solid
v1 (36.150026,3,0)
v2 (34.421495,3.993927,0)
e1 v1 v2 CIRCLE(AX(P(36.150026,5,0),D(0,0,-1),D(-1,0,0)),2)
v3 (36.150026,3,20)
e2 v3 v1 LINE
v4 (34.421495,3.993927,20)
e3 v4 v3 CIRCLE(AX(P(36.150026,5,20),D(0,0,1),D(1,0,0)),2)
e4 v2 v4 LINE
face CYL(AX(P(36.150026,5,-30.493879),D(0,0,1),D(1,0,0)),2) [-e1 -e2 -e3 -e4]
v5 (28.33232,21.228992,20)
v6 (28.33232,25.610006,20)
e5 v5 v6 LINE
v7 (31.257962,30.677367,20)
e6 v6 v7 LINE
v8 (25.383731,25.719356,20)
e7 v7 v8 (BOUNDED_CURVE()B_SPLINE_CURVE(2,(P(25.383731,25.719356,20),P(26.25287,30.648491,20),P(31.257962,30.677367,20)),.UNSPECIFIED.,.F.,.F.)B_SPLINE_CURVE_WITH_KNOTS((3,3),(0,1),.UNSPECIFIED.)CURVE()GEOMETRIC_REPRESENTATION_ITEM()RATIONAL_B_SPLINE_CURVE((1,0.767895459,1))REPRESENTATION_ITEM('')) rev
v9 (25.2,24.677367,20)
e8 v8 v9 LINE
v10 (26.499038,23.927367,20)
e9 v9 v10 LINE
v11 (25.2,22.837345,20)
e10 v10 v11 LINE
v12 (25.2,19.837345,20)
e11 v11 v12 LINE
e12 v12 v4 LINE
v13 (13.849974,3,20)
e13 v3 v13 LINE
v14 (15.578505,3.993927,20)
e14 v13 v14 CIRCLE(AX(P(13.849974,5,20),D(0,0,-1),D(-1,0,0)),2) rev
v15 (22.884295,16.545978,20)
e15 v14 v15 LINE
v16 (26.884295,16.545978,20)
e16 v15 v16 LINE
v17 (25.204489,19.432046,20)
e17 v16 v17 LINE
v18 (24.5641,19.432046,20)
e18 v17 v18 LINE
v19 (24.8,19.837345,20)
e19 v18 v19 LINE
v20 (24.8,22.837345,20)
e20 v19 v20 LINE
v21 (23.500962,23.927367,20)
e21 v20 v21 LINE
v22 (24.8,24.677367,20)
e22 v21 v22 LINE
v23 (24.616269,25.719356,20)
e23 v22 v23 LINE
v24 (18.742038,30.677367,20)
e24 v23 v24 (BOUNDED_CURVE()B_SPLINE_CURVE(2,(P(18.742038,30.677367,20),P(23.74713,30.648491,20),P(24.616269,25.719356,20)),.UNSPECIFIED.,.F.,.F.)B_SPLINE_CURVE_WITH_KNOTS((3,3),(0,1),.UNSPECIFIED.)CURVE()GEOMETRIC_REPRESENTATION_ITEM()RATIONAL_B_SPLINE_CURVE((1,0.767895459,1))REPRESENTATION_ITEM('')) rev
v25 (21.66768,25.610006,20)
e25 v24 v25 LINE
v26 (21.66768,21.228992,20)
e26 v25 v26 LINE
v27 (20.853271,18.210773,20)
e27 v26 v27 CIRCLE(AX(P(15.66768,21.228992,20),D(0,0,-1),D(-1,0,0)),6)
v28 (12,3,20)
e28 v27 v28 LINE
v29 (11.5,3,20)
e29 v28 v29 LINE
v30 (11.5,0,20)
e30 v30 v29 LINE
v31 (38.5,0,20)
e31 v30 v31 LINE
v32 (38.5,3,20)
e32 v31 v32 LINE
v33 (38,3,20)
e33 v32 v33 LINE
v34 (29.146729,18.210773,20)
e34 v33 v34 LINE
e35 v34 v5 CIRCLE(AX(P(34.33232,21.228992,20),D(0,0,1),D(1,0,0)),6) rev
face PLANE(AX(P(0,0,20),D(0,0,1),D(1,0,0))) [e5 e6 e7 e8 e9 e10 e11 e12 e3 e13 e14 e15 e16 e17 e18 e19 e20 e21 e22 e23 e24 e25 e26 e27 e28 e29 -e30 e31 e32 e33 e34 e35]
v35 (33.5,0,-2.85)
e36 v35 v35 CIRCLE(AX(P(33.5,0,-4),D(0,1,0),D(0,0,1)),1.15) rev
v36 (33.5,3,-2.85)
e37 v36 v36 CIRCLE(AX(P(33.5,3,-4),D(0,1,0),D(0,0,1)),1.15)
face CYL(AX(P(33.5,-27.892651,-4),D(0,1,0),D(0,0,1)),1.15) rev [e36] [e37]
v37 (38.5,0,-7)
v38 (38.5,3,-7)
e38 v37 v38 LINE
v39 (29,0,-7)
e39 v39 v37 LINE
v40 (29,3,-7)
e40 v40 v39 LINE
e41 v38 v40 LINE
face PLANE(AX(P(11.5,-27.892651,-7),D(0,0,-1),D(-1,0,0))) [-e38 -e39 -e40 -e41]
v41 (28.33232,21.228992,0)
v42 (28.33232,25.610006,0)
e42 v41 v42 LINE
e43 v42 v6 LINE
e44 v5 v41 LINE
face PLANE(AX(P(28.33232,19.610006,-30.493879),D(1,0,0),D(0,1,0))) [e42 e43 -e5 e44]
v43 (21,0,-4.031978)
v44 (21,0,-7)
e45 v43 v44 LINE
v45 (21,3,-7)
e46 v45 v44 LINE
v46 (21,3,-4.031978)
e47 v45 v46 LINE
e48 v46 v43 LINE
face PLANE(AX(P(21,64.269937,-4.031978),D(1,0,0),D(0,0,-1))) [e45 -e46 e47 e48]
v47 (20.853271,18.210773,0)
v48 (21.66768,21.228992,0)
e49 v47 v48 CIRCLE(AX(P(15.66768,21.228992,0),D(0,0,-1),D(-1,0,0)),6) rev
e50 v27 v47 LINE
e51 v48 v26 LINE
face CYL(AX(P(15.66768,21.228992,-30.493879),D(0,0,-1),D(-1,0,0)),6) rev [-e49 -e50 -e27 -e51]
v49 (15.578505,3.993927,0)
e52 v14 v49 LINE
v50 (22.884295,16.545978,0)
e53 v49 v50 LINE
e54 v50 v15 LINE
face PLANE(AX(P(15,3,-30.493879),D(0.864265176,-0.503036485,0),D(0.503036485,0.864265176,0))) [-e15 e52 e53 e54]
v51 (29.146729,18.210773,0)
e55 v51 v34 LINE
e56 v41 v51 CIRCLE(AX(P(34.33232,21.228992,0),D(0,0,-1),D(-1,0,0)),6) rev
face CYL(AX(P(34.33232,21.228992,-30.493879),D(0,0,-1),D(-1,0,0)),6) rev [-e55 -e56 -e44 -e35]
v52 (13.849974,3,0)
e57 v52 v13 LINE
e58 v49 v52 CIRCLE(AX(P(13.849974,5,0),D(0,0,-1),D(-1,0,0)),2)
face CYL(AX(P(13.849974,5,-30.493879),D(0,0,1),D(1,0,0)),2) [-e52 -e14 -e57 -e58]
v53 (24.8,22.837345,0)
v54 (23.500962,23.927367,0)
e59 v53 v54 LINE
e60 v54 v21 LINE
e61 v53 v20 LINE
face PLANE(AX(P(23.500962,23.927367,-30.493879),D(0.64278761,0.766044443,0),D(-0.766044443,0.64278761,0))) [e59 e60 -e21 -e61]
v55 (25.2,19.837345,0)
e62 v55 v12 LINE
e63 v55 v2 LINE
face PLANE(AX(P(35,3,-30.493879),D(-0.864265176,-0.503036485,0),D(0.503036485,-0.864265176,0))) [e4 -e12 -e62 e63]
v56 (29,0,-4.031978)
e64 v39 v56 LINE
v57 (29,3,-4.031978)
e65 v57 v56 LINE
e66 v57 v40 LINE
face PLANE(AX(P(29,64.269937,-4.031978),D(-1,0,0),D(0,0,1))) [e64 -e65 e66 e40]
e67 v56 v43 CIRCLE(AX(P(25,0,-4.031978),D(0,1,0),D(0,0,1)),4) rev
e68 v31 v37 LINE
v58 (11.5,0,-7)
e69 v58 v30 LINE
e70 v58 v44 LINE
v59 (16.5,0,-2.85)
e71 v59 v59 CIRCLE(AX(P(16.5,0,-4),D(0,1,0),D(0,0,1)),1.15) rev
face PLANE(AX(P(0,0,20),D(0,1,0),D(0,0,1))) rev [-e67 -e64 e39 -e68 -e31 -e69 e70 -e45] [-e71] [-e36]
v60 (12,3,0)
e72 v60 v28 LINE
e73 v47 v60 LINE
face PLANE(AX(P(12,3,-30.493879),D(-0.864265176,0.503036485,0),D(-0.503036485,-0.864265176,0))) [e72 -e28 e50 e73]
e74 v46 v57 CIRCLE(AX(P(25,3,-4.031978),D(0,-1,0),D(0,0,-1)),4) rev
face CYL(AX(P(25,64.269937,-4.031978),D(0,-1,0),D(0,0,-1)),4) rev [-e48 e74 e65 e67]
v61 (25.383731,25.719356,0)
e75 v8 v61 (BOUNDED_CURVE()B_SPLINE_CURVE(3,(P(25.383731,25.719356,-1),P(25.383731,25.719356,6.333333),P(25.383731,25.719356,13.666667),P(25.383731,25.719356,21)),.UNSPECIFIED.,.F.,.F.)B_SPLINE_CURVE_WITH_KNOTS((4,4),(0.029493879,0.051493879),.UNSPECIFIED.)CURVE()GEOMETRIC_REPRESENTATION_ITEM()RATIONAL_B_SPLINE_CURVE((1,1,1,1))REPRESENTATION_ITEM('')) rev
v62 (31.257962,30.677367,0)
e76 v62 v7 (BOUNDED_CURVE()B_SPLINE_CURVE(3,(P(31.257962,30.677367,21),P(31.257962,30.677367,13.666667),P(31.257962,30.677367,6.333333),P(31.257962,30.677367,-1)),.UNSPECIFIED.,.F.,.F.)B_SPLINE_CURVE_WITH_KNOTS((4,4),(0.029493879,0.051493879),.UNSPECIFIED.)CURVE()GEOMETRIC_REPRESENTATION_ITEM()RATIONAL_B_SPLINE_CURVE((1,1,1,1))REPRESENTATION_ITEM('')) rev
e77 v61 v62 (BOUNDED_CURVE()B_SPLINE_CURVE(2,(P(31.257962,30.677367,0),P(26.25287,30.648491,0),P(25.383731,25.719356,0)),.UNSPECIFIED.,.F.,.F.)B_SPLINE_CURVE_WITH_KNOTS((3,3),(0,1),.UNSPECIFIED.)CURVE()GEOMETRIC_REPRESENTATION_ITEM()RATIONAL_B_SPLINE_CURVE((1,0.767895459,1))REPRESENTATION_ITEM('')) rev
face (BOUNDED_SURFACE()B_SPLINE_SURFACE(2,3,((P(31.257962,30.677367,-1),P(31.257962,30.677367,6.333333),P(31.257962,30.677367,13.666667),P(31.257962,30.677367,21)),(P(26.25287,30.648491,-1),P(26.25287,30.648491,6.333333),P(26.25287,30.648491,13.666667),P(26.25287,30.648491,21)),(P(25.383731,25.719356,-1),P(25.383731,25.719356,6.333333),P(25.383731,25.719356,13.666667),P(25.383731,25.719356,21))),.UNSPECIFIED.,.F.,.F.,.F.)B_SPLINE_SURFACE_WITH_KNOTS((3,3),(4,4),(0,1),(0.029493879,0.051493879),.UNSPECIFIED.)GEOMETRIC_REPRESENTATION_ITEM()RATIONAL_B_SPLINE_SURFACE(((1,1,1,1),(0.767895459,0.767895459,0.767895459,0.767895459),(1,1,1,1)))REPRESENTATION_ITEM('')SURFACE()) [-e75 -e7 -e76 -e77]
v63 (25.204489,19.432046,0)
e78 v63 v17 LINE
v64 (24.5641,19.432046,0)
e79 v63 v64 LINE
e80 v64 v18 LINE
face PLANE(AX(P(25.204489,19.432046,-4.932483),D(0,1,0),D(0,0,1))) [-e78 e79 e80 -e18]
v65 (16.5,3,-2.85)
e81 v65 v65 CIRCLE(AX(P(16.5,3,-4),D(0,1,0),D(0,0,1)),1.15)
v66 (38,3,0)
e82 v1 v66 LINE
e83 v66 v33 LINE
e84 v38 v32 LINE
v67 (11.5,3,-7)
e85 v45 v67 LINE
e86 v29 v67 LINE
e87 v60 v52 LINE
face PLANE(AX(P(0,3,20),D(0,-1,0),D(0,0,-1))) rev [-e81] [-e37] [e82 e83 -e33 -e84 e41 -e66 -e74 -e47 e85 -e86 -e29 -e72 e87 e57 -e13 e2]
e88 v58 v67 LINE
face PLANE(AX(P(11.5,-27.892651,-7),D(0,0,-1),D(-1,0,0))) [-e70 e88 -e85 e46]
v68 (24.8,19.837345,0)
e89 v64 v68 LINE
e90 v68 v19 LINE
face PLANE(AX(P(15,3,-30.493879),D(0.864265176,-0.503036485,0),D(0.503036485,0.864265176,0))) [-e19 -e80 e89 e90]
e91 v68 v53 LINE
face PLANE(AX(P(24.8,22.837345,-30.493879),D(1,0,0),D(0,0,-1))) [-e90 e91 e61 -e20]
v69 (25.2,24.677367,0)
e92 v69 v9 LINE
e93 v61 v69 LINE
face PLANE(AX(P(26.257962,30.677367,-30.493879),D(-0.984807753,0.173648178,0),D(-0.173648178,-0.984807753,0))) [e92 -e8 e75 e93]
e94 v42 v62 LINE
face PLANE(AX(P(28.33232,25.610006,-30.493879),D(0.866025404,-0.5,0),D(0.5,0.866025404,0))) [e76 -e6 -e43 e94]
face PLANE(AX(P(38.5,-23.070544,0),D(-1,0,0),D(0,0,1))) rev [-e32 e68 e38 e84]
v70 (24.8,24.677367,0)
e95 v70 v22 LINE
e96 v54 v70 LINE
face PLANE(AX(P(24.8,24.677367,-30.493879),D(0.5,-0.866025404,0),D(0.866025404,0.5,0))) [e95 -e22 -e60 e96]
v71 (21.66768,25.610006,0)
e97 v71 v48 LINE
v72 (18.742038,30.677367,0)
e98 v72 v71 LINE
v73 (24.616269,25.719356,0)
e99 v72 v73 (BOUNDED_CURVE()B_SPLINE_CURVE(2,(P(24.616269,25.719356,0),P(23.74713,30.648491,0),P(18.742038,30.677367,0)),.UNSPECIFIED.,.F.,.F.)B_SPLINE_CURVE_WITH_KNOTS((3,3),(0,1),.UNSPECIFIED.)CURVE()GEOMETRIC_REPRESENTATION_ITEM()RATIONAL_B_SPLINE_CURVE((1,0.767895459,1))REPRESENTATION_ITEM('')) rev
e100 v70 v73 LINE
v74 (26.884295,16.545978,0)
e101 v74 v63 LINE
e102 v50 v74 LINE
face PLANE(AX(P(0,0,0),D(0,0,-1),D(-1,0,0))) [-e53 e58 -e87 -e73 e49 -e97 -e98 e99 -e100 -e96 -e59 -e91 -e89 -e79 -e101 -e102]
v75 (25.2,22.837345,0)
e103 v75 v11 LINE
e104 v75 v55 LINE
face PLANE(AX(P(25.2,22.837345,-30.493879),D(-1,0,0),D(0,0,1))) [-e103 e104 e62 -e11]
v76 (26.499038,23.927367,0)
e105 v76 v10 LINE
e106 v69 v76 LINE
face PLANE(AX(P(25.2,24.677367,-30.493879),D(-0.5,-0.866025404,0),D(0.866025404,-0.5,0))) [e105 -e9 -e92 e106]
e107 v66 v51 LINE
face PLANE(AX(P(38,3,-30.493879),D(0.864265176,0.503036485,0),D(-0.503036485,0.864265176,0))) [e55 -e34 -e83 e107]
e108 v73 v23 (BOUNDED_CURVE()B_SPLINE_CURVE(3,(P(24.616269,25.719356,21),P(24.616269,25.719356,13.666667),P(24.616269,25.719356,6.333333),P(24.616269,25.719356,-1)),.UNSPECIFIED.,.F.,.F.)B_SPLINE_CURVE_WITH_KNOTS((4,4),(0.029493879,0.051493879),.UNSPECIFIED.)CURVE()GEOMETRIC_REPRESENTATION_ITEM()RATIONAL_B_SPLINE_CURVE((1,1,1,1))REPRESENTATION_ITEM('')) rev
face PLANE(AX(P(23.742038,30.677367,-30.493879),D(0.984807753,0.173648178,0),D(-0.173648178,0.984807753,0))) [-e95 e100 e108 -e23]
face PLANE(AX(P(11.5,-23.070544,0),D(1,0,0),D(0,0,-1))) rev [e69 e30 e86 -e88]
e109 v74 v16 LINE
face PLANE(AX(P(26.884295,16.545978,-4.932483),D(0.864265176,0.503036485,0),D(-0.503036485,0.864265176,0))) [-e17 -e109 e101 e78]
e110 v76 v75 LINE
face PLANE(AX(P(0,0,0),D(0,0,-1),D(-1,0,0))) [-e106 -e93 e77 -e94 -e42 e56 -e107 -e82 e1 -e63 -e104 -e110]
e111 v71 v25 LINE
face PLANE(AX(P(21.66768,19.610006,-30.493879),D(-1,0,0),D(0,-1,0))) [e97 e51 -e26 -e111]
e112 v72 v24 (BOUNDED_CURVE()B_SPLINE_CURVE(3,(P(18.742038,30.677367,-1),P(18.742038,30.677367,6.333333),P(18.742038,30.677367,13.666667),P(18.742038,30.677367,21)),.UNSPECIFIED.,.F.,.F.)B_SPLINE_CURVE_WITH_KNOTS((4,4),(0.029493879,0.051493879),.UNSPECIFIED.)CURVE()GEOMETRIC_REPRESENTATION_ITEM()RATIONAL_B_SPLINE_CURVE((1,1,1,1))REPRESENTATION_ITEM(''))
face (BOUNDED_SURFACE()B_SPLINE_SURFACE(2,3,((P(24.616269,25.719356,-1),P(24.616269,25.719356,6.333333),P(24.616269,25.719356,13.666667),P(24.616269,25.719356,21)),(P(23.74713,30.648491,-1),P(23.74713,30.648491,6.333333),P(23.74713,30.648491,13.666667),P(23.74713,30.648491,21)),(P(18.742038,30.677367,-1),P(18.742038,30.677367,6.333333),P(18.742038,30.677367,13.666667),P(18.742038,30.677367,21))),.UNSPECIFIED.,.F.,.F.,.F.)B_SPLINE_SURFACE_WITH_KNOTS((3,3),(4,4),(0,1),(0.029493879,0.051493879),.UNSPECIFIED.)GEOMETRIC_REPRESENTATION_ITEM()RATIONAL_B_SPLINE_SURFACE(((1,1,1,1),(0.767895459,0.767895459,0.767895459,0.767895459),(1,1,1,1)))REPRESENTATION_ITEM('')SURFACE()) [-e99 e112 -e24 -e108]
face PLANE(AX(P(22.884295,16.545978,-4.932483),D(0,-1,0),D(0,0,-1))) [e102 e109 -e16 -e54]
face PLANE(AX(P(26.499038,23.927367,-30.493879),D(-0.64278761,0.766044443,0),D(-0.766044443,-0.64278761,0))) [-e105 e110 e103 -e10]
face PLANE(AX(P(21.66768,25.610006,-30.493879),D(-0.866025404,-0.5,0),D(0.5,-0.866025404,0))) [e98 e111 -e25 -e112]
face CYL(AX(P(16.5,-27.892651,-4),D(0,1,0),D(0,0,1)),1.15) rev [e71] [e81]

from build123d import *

# Parameters (mm, degrees)
SCHIZZO1_W                     = 50
SCHIZZO1_H                     = 3
ESTRUSIONE_ESTRUSIONE1_DEPTH   = 20
ESTRUSIONE_ESTRUSIONE2_DEPTH   = 20
ESTRUSIONE_ESTRUSIONE2_2_DEPTH = 20
RACCORDO2_R                    = 6
RACCORDO3_DEPTH                = 20
RACCORDO4_R                    = 6
RACCORDO5_R                    = 6
RACCORDO7_R                    = 2
RACCORDO8_R                    = 2
SCHIZZO5_W                     = 11.5
SCHIZZO5_H                     = 20
TAGLIO_ESTRUSIONE2_DEPTH       = 3
ESTRUSIONE_ESTRUSIONE7_DEPTH   = 20
SCHIZZO12_R                    = 1.15
ESTRUSIONE_ESTRUSIONE9_DEPTH   = 3
TAGLIO_ESTRUSIONE4_DEPTH       = 52.461506674
TAGLIO_ESTRUSIONE4_DEPTH_BACK  = 52.461506674


with BuildPart() as part:
    # Schizzo1 → Estrusione-Estrusione1 (new body)
    with BuildSketch(Plane.XY):
        with Locations((25, 1.5)):
            Rectangle(SCHIZZO1_W, SCHIZZO1_H)
    extrude(amount=ESTRUSIONE_ESTRUSIONE1_DEPTH)

    # Schizzo5 → Taglio-Estrusione2 (cut)
    with BuildSketch(Plane(origin=(0, 3, 0), x_dir=(1, 0, 0), z_dir=(0, 1, 0))):
        with Locations((5.75, -10)):
            Rectangle(SCHIZZO5_W, SCHIZZO5_H)
        with Locations((44.25, -10)):
            Rectangle(SCHIZZO5_W, SCHIZZO5_H)
    extrude(amount=-TAGLIO_ESTRUSIONE2_DEPTH, mode=Mode.SUBTRACT)



with BuildPart() as body_2:
    # Schizzo2 → Estrusione-Estrusione2 (new body)
    with BuildSketch(Plane.XY.offset(20)):
        Polygon((12, 3), (21.667680152, 19.610006491), (21.667680152, 25.610006491), (18.742038116, 30.677367142), (23.742038116, 30.677367142), (24.8, 24.677367142), (23.500961894, 23.927367142), (24.8, 22.837344747), (24.8, 19.837344747), (15, 3), align=None)
    extrude(amount=-ESTRUSIONE_ESTRUSIONE2_DEPTH)

    # Raccordo2
    # the kernel refuses this fillet: 6 mm, written as the material it takes off along each edge
    with BuildSketch(Plane(origin=(23.742038116, 30.677367142, 32.586494468), x_dir=(-1, 0, 0), z_dir=(0, 0, -1))) as raccordo2_piece_1:
        with BuildLine():
            CenterArc((RACCORDO2_R * 0.839099631177, -RACCORDO2_R), RACCORDO2_R, 90, 80)
            Line((-RACCORDO2_R * 0.145708121835, -RACCORDO2_R * 0.826351822333), (0, 0))
            Line((0, 0), (RACCORDO2_R * 0.839099631177, 0))
        make_face()
    extrude(amount=45.172988935, mode=Mode.SUBTRACT)

    # Raccordo5
    raccordo5_edges = [body_2.edges().sort_by_distance(p)[0] for p in [
        (21.667680152, 19.610006491, 10),
    ]]
    fillet(raccordo5_edges, radius=RACCORDO5_R)

    # Raccordo8
    raccordo8_edges = [body_2.edges().sort_by_distance(p)[0] for p in [
        (15, 3, 10),
    ]]
    fillet(raccordo8_edges, radius=RACCORDO8_R)

    # Schizzo9 → Estrusione-Estrusione7 (add)
    with BuildSketch(Plane.XY.offset(20)):
        Polygon((24.564100135, 19.432046037), (22.884294771, 16.545978484), (26.884294771, 16.545978484), (25.204489408, 19.432046037), align=None)
    extrude(amount=-ESTRUSIONE_ESTRUSIONE7_DEPTH)


with BuildPart() as body_3:
    # Schizzo2 → Estrusione-Estrusione2 2 (new body)
    with BuildSketch(Plane.XY.offset(20)):
        Polygon((26.499038106, 23.927367142), (25.2, 22.837344747), (25.2, 19.837344747), (35, 3), (38, 3), (28.332319848, 19.610006491), (28.332319848, 25.610006491), (31.257961884, 30.677367142), (26.257961884, 30.677367142), (25.2, 24.677367142), align=None)
    extrude(amount=-ESTRUSIONE_ESTRUSIONE2_2_DEPTH)

    # Raccordo3: read off the stored shape, not the designer's step
    # Raccordo3 outline → Raccordo3 (cut)
    with BuildSketch(Plane.XY):
        with BuildLine():
            add(Edge.make_bspline(
                [(31.257961884, 30.677367142), (26.252870263, 30.648491125), (25.38373076, 25.719356061)],
                knots=[0, 0, 0, 1, 1, 1], degree=2, weights=[1, 0.767895459, 1]))
            Line((31.257961884, 30.677367142), (26.257961884, 30.677367142))
            Line((26.257961884, 30.677367142), (25.38373076, 25.719356061))
        make_face()
    extrude(amount=RACCORDO3_DEPTH, mode=Mode.SUBTRACT)

    # Raccordo4
    raccordo4_edges = [body_3.edges().sort_by_distance(p)[0] for p in [
        (28.332319848, 19.610006491, 10),
    ]]
    fillet(raccordo4_edges, radius=RACCORDO4_R)

    # Raccordo7
    raccordo7_edges = [body_3.edges().sort_by_distance(p)[0] for p in [
        (35, 3, 10),
    ]]
    fillet(raccordo7_edges, radius=RACCORDO7_R)


with BuildPart() as part_1:
    add(part.part)

    add(body_2.part)  # Estrusione-Estrusione9 merges body 2

    add(body_3.part)  # Estrusione-Estrusione9 merges body 3
    # Schizzo12 → Estrusione-Estrusione9 (add)
    with BuildSketch(Plane(origin=(0, 3, 0), x_dir=(1, 0, 0), z_dir=(0, 1, 0))):
        Polygon((11.5, 0), (38.5, 0), (38.5, 7), (29, 7), (21, 7), (11.5, 7), align=None)
        with Locations(Location((16.5, 4, 0), (0, 0, 270))):
            Circle(SCHIZZO12_R, mode=Mode.SUBTRACT)
        with Locations(Location((33.5, 4, 0), (0, 0, 270))):
            Circle(SCHIZZO12_R, mode=Mode.SUBTRACT)
    extrude(amount=-ESTRUSIONE_ESTRUSIONE9_DEPTH)

    # Schizzo13 → Taglio-Estrusione4 (cut, two sides: drawn at the far end of the back side and taken through both)
    with BuildSketch(Plane(origin=(0, 3, 0), x_dir=(1, 0, 0), z_dir=(0, 1, 0)).offset(-TAGLIO_ESTRUSIONE4_DEPTH_BACK)):
        with BuildLine():
            Line((21, 7), (21, 4.031977604))
            ThreePointArc((21, 4.031977604), (25, 0.031977604), (29, 4.031977604))
            Line((29, 4.031977604), (29, 7))
            Line((29, 7), (21, 7))
        make_face()
    extrude(amount=TAGLIO_ESTRUSIONE4_DEPTH + TAGLIO_ESTRUSIONE4_DEPTH_BACK, mode=Mode.SUBTRACT)


solid = part_1.part
